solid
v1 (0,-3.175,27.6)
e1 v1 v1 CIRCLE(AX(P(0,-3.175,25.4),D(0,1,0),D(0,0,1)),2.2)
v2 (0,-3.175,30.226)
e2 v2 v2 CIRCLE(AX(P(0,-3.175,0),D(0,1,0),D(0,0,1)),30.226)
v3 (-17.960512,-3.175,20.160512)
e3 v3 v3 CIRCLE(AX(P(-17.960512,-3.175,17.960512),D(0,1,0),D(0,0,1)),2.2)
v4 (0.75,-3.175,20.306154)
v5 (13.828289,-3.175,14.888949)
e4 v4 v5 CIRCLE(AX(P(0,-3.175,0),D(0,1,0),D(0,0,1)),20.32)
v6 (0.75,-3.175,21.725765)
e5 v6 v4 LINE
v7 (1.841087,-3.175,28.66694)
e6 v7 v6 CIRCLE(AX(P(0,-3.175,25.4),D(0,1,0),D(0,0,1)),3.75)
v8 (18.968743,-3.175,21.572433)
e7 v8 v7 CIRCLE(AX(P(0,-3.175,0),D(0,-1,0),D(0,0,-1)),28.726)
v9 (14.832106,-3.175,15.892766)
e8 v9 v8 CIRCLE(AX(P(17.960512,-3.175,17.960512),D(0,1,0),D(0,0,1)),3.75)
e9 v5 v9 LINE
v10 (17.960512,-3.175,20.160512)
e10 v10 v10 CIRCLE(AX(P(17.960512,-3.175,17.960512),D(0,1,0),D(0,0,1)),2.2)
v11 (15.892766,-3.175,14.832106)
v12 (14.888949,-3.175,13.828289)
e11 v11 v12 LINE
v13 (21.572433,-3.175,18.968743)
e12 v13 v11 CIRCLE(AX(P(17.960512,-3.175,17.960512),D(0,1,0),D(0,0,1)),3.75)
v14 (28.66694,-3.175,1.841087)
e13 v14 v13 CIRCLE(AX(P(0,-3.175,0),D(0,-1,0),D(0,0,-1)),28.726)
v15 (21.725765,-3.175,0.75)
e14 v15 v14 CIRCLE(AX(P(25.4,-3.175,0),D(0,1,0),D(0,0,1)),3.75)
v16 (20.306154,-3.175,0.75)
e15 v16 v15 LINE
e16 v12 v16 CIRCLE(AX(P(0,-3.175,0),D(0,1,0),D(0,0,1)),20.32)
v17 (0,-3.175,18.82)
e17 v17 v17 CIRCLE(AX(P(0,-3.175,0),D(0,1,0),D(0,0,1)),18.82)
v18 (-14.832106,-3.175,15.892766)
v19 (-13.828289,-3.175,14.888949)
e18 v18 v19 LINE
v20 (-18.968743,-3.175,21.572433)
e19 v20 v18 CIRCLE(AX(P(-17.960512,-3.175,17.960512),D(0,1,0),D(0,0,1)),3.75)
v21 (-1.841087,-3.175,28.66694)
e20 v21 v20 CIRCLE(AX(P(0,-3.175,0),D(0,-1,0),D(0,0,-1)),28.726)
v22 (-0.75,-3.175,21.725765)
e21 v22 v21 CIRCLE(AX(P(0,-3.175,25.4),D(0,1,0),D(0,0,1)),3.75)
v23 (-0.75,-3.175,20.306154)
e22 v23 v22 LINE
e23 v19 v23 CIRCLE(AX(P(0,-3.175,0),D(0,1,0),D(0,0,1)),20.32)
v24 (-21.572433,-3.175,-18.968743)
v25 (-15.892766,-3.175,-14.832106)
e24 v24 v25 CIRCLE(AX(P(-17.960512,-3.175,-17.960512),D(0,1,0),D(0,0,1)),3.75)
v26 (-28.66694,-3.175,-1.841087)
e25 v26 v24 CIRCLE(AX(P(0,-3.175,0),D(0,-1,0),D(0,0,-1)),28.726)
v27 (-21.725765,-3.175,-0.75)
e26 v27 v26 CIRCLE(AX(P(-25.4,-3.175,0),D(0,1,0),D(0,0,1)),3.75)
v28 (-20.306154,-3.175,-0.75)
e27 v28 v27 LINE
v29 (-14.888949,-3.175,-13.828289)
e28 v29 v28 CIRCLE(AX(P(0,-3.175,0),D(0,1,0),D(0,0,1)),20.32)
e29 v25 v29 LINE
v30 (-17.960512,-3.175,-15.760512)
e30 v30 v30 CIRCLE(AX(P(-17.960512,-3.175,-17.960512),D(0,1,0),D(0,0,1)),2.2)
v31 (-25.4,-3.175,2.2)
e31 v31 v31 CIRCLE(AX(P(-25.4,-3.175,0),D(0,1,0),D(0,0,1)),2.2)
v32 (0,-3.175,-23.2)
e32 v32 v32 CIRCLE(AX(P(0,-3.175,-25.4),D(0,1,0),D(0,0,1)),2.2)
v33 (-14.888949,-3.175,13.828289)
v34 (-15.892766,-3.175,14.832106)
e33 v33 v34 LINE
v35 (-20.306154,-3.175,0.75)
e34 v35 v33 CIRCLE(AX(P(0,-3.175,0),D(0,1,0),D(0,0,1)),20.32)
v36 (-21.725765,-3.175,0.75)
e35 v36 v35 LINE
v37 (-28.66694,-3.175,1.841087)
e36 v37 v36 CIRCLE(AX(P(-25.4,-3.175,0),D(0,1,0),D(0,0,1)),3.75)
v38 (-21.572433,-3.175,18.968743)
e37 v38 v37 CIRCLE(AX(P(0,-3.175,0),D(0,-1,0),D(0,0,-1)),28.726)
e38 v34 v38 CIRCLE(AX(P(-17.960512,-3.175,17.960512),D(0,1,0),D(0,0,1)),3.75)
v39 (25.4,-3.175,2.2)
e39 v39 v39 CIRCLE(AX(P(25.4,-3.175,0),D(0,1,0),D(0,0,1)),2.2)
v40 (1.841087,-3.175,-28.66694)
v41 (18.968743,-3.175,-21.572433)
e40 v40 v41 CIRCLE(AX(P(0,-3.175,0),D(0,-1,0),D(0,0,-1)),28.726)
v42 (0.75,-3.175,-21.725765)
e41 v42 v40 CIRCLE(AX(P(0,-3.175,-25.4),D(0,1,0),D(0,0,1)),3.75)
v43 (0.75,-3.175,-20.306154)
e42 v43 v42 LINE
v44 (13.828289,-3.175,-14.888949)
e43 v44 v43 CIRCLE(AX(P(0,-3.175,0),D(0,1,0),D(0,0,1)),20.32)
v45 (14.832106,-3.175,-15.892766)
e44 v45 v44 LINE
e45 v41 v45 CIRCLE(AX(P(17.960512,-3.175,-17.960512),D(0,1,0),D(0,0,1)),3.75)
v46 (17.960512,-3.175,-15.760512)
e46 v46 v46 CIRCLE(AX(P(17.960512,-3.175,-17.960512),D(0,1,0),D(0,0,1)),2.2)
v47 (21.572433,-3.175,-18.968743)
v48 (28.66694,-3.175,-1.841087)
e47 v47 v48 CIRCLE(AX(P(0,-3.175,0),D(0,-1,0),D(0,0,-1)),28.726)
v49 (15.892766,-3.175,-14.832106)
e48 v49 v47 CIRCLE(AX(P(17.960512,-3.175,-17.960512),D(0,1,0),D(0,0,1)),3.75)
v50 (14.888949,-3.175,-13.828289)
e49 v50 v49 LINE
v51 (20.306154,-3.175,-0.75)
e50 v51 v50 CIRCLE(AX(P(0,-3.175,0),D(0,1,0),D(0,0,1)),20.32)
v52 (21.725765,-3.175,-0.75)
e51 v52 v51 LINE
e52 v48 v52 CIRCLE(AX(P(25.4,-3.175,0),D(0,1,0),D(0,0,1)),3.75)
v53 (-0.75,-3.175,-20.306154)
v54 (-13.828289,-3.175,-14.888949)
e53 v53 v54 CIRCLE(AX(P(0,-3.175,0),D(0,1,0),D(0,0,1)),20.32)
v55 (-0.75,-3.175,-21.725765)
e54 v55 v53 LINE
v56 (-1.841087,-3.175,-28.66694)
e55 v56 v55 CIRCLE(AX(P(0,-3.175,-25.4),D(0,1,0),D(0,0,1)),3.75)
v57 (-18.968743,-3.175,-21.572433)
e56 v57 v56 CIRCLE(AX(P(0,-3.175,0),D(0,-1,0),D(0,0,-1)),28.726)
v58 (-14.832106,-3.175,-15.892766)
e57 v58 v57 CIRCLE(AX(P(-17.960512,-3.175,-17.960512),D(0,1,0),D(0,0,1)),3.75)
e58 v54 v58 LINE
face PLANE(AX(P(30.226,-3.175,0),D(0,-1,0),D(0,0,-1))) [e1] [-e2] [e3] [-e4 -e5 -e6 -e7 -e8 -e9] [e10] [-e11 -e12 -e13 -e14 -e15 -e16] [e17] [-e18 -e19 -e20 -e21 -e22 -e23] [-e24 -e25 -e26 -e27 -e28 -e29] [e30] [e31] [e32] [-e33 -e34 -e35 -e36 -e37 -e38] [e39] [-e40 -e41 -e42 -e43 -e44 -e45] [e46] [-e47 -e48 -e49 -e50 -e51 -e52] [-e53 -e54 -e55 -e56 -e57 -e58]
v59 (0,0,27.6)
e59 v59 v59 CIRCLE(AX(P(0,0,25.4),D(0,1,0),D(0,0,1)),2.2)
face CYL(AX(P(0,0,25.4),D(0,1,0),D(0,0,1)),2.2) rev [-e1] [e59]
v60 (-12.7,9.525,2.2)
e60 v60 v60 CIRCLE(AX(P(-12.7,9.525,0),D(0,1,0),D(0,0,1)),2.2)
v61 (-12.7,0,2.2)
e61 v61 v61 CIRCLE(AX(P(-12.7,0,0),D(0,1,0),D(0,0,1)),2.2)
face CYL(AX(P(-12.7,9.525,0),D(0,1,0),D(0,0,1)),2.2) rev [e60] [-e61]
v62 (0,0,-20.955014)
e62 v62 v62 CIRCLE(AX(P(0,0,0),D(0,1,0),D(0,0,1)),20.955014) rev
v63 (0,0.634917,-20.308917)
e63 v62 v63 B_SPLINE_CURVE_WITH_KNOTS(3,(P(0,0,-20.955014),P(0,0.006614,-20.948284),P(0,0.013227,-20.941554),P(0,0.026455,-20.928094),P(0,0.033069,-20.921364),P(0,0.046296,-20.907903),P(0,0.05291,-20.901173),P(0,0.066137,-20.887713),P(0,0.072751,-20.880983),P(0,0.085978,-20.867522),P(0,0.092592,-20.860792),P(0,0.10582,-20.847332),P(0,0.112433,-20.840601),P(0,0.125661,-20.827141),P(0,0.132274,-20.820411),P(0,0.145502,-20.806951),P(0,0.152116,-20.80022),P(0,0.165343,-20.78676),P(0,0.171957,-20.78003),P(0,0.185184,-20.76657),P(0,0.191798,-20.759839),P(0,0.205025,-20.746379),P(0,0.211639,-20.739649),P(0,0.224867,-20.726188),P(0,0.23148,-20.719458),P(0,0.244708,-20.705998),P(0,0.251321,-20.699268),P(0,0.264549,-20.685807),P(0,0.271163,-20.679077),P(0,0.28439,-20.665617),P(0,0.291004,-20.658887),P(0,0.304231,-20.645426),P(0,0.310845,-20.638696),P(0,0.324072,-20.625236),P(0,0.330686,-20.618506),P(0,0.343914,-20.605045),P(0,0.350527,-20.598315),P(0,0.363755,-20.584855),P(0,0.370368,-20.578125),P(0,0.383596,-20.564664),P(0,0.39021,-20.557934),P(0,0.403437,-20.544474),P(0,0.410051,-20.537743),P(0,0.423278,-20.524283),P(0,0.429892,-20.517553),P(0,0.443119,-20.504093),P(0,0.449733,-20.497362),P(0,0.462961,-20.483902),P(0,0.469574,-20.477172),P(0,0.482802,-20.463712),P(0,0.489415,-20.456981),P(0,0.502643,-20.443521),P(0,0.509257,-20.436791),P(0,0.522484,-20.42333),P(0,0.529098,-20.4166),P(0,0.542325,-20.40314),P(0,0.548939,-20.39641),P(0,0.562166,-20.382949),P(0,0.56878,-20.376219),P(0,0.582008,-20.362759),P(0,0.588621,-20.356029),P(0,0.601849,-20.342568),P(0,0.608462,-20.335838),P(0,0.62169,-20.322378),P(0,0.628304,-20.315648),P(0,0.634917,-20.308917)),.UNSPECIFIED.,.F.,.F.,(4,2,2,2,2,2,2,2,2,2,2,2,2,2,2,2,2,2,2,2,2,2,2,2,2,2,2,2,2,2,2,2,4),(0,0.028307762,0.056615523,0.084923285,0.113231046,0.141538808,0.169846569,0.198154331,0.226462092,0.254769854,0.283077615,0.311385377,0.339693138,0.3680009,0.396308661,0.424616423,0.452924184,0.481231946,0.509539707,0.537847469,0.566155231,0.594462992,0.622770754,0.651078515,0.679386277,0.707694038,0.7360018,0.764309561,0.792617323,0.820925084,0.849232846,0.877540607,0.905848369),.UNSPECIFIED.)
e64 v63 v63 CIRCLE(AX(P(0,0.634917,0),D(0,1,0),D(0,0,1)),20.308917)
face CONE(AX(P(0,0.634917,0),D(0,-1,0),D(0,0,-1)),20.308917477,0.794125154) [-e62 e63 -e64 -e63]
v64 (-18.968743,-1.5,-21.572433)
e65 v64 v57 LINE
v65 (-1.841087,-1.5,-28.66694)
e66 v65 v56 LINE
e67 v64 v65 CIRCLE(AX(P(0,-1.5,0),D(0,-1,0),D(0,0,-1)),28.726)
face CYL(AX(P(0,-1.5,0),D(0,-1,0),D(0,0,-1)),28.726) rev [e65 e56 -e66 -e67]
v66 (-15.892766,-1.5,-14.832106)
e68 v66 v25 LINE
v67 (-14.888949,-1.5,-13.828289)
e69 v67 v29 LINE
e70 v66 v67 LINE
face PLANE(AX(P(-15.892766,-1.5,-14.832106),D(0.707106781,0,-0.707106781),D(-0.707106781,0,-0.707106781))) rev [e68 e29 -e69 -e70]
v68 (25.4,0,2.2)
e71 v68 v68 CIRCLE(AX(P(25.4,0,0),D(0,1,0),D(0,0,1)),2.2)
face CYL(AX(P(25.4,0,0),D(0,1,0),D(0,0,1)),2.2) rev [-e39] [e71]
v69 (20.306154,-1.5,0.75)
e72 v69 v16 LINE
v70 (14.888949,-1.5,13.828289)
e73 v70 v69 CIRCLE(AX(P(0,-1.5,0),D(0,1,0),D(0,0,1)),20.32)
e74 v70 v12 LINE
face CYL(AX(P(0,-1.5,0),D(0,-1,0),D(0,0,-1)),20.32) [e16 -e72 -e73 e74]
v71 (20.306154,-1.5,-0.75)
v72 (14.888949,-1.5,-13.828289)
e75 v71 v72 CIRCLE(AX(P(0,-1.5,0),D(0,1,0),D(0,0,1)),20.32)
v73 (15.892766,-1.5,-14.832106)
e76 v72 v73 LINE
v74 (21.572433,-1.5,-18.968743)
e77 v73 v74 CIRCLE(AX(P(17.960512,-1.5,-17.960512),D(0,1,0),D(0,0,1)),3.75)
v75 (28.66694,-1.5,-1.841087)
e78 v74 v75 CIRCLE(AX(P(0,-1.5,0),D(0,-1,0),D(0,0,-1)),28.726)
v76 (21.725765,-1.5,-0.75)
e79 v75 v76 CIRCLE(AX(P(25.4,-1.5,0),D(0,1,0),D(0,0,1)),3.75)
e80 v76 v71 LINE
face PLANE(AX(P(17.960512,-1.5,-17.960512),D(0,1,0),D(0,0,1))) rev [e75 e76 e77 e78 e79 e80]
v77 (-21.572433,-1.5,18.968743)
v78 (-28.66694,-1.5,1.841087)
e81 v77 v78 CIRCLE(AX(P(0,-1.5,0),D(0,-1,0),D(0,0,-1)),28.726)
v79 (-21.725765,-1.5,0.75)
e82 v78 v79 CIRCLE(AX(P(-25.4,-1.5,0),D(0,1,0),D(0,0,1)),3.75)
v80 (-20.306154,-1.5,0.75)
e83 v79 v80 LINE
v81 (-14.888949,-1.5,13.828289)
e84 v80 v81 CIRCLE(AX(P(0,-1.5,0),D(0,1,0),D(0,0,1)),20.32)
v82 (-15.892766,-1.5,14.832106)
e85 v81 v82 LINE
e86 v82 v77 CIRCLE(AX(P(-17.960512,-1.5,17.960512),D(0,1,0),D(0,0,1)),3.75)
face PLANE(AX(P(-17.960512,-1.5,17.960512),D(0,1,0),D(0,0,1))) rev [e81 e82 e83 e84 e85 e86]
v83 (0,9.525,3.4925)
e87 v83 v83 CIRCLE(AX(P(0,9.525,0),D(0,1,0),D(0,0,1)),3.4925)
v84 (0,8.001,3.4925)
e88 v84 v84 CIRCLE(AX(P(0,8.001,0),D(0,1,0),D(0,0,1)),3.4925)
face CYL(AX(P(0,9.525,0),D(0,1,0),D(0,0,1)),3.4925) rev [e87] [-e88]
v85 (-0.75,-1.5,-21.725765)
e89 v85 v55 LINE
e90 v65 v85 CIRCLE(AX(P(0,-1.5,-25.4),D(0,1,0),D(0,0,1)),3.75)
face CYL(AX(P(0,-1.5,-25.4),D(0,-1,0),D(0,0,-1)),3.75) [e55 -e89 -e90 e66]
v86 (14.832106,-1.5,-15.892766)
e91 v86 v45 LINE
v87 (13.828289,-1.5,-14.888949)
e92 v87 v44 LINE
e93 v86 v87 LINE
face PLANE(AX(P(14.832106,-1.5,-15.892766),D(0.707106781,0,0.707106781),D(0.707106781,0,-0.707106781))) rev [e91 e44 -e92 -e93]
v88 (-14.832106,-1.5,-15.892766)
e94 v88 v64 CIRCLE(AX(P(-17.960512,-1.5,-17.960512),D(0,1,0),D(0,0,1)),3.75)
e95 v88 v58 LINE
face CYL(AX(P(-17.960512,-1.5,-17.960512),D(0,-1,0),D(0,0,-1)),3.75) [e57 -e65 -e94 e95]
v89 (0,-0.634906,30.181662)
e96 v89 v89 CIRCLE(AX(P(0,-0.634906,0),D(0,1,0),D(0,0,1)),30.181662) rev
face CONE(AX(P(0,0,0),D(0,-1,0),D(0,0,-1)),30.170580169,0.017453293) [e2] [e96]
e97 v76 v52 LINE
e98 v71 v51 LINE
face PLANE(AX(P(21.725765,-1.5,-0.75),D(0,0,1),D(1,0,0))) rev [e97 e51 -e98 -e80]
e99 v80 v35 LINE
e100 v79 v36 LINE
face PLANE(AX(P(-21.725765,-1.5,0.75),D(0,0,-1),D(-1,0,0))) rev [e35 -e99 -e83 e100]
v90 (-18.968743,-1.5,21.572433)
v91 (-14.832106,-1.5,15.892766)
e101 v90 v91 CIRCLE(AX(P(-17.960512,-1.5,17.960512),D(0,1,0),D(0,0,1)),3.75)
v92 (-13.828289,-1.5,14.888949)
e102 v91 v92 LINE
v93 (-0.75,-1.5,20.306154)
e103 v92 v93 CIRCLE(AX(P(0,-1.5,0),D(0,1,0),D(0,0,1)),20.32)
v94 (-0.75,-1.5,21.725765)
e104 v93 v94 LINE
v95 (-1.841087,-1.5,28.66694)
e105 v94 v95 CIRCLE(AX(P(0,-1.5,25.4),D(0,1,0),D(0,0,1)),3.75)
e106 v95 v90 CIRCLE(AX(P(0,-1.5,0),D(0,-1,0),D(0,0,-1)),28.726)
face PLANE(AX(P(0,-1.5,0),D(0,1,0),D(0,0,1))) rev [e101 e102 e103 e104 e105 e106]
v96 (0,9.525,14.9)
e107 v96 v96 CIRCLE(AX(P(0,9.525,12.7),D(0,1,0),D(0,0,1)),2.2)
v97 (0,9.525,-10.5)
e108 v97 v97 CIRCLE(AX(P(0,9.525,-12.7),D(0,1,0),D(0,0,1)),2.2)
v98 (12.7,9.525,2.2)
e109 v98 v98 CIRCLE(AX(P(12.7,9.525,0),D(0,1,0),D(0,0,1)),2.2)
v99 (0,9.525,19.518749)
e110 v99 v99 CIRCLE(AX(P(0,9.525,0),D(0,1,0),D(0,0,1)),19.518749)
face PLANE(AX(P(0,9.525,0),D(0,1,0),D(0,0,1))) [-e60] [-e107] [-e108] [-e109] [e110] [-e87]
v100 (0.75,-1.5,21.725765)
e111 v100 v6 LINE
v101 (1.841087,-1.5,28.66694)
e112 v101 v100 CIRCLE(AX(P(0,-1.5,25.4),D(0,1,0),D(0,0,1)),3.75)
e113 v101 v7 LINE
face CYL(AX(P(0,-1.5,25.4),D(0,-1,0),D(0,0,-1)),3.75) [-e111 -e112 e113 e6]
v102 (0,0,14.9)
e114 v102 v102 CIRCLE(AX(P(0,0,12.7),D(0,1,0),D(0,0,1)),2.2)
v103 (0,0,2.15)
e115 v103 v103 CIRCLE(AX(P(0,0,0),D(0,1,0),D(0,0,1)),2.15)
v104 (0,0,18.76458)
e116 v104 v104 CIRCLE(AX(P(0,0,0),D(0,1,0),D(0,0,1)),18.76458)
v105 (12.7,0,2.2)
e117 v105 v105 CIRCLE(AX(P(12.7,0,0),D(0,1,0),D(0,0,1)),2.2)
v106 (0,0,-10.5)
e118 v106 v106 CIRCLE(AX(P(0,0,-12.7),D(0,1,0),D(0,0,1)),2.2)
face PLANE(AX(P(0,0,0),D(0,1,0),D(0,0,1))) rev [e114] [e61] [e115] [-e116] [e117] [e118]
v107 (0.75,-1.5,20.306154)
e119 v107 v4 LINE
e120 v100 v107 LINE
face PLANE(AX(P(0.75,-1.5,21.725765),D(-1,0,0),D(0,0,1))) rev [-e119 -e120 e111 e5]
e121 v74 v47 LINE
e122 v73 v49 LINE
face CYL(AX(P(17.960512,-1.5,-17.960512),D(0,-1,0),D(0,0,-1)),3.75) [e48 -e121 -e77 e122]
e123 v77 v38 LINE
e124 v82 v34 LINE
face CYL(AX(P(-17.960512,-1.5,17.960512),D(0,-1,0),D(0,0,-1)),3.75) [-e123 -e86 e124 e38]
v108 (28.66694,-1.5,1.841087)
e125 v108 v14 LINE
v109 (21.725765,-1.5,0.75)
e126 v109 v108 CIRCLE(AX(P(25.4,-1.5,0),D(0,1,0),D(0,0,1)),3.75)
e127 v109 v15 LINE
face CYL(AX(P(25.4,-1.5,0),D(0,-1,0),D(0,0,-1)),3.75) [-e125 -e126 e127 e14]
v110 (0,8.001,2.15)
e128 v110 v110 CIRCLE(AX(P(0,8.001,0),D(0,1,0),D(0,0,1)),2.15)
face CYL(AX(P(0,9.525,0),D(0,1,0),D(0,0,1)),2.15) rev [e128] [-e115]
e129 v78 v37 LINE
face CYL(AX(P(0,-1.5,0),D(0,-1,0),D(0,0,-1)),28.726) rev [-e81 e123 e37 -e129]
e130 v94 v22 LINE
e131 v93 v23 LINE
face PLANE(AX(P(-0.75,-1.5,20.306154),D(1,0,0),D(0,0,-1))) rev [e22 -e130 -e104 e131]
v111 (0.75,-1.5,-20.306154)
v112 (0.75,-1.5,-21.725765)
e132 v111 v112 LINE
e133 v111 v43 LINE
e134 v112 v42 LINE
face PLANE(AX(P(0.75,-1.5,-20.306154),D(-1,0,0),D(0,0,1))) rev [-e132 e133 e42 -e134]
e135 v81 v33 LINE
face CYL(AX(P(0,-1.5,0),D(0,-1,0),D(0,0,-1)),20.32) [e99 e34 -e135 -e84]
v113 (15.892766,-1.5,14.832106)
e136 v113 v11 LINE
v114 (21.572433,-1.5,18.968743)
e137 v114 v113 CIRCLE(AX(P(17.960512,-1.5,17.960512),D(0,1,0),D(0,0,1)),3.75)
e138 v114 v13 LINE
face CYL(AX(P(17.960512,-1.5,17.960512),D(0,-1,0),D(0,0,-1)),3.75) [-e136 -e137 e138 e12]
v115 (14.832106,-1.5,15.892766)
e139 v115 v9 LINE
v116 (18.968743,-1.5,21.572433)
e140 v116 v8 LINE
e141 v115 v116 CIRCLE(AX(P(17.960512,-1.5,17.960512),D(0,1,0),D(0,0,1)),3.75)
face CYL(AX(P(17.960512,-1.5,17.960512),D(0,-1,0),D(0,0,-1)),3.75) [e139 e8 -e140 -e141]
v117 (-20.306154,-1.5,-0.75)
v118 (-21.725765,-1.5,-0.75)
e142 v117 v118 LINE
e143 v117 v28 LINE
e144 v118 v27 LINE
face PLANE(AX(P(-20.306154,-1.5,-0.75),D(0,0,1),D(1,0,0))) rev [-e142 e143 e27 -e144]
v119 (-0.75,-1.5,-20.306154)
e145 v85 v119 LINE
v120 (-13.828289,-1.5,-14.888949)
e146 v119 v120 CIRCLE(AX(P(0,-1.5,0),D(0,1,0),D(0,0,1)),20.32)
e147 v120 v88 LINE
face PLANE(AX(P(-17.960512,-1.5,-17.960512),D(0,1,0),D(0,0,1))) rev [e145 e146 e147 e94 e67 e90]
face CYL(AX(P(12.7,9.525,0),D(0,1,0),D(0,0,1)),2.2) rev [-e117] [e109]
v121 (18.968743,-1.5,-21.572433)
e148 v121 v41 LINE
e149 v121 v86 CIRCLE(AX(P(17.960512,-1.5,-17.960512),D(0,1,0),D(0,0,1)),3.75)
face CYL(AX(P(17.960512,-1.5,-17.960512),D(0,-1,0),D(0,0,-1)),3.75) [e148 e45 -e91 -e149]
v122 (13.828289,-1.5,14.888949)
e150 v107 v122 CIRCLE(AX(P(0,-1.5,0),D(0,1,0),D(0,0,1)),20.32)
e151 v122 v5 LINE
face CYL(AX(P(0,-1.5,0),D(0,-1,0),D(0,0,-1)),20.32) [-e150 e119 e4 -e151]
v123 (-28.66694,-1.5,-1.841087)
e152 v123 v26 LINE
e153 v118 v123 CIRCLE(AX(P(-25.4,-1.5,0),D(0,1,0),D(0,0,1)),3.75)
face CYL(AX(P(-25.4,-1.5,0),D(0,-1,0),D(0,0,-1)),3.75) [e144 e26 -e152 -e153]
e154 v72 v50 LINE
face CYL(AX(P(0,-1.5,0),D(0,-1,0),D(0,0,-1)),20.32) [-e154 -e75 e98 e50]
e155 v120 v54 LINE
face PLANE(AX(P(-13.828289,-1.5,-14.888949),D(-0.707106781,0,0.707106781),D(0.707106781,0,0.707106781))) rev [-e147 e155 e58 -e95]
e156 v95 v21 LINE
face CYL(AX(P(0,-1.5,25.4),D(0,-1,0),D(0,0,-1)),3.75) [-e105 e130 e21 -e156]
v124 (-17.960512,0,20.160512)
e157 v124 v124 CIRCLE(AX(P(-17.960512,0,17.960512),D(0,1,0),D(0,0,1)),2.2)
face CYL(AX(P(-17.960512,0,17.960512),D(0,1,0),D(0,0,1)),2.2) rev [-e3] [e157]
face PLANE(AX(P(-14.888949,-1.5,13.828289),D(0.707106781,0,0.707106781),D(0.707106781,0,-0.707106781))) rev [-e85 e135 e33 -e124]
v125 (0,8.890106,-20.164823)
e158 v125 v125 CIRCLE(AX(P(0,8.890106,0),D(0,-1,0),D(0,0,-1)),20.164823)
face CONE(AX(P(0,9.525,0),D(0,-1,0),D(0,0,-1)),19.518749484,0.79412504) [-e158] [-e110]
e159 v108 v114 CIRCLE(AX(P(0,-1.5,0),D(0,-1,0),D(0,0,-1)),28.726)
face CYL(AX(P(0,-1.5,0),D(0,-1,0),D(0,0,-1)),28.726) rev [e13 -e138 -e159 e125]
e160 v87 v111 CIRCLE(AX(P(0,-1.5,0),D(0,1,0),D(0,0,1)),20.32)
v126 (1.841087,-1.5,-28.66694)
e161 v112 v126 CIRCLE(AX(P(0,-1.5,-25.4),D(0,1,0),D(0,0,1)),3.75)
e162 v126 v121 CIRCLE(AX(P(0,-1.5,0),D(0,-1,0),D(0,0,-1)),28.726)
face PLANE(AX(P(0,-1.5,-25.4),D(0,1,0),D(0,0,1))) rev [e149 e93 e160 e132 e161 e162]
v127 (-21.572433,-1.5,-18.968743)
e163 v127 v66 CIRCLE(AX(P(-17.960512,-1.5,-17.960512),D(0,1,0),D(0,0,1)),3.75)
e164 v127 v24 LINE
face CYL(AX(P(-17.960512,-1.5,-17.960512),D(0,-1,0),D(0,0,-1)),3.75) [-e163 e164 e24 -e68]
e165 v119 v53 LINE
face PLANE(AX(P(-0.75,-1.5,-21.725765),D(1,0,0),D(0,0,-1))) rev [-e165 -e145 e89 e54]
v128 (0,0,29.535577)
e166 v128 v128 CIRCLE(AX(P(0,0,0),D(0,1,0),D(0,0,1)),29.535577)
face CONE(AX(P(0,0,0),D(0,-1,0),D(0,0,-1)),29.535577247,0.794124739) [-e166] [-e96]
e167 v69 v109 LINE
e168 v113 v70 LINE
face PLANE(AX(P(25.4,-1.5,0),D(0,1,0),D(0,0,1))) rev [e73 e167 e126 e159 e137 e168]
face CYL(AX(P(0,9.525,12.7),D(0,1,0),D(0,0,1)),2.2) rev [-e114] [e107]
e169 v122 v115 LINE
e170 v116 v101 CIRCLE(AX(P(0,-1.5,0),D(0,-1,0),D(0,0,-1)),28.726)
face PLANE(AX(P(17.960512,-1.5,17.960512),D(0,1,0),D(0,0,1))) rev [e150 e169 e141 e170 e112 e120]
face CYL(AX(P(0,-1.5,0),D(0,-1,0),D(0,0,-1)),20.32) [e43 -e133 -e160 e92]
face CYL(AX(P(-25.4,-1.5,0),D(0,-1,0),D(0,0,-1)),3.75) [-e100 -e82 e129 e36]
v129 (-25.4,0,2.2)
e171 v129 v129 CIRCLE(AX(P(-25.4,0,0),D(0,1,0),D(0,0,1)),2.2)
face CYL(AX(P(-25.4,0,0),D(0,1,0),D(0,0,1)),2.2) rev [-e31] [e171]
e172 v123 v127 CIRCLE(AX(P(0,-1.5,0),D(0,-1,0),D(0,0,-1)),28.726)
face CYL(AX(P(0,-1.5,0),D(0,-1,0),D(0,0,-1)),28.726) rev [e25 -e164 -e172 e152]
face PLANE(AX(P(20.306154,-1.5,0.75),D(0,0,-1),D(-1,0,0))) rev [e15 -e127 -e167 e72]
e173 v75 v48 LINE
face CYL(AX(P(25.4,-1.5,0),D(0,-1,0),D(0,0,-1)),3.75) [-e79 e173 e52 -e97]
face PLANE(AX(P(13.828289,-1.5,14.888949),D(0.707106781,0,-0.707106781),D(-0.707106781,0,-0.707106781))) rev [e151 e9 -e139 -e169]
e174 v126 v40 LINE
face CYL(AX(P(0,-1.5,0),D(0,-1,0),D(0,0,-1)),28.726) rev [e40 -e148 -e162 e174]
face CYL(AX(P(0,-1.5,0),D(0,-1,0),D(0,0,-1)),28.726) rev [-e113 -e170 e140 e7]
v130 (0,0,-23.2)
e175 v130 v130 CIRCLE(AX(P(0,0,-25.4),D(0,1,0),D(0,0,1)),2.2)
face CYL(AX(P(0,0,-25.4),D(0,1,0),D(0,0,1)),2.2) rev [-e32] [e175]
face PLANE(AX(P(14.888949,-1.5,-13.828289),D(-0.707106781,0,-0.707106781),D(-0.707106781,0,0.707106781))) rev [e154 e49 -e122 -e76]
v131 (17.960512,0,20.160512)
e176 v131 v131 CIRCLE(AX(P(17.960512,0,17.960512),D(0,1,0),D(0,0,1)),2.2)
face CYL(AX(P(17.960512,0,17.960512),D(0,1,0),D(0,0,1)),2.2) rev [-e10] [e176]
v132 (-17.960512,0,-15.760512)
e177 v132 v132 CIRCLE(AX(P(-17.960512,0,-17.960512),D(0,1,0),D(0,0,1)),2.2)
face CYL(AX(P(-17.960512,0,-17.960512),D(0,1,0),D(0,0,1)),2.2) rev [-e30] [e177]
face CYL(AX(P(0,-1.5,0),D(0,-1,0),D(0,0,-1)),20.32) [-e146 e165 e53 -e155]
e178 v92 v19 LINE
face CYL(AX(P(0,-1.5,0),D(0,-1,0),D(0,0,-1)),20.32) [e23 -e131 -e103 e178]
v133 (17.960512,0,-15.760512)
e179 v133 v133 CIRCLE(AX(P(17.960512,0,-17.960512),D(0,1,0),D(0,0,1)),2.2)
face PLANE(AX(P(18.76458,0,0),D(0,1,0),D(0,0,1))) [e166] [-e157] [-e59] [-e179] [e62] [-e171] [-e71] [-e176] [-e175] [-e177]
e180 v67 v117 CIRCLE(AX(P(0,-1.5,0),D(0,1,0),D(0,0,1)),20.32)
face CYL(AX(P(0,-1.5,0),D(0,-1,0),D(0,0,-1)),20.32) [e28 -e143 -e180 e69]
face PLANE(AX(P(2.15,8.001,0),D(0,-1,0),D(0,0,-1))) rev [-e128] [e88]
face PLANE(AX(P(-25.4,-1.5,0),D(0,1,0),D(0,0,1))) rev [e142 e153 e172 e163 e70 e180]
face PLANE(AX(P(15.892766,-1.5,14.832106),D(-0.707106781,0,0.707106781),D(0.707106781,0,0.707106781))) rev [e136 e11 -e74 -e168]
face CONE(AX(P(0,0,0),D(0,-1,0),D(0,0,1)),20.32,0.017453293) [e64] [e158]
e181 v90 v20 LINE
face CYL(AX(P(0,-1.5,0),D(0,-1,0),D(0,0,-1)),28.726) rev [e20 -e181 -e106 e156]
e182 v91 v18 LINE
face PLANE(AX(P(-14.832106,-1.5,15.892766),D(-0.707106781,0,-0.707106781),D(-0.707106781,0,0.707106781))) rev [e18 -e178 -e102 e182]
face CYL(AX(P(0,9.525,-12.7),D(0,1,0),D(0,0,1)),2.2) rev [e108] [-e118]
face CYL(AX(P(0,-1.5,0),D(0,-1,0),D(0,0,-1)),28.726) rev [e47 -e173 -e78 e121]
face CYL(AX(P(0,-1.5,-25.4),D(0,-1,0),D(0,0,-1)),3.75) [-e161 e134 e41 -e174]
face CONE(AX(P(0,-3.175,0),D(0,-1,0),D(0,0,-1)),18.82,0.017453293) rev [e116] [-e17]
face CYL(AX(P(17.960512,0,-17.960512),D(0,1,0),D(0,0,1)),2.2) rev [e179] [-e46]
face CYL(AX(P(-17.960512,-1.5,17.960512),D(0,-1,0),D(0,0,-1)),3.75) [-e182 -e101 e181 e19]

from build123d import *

# Parameters (mm, degrees)
SKETCH2_R                                        = 20.32
BOSS_EXTRUDE1_DEPTH                              = 9.525
BOSS_EXTRUDE1_TAPER                              = 1
CUT_EXTRUDE1_DEPTH                               = 1.675
CUT_EXTRUDE2_DEPTH                               = 1.675
CUT_EXTRUDE3_DEPTH                               = 1.675
CUT_EXTRUDE4_DEPTH                               = 1.675
CUT_EXTRUDE5_DEPTH                               = 1.675
CUT_EXTRUDE6_DEPTH                               = 1.675
CUT_EXTRUDE7_DEPTH                               = 1.675
CUT_EXTRUDE8_DEPTH                               = 1.675
SKETCH11_W                                       = 4
SKETCH11_H                                       = 6.374
F_4_4_4_4_DIAMETER_HOLE1_D                       = 4.4
F_4_4_4_4_DIAMETER_HOLE2_D                       = 4.4
CBORE_FOR_M4_HEX_HEAD_MACHINE_SCREW1_D           = 4.3
CBORE_FOR_M4_HEX_HEAD_MACHINE_SCREW1_CBORE_D     = 6.985
CBORE_FOR_M4_HEX_HEAD_MACHINE_SCREW1_CBORE_DEPTH = 1.524
CHAMFER1_SIZE                                    = 0.635014452
CHAMFER1_SIZE2                                   = 0.635014007
CHAMFER2_SIZE                                    = 0.634991023
CHAMFER2_SIZE_2                                  = 0.634990726
CHAMFER3_SIZE                                    = 0.635002922
CHAMFER3_SIZE2                                   = 0.635003014


with BuildPart() as part:
    # Sketch1 → Revolve1 (revolve)
    with BuildSketch(Plane(origin=(0, 0, 0), x_dir=(-1, 0, 0), z_dir=(0, 0, -1)), mode=Mode.PRIVATE) as revolve1_sk:
        Polygon((-30.226, -3.175), (-18.82, -3.175), (-18.764580169, 0), (-30.170580169, 0), align=None)
    revolve(revolve1_sk.sketch.rotate(Axis((0, -3.175, 0), (0, 1, 0)), 270), axis=Axis((0, -3.175, 0), (0, 1, 0)))

    # Sketch2 → Boss-Extrude1 (add)
    with BuildSketch(Plane(origin=(0, 0, 0), x_dir=(-1, 0, 0), z_dir=(0, 1, 0))):
        Circle(SKETCH2_R)
    extrude(amount=BOSS_EXTRUDE1_DEPTH, taper=BOSS_EXTRUDE1_TAPER)

    # Sketch3 → Cut-Extrude1 (cut)
    with BuildSketch(Plane.XZ.offset(3.175)):
        with BuildLine():
            Line((-0.75, 20.30615424), (-0.75, 21.725765386))
            ThreePointArc((-0.75, 21.725765386), (-3.704512163, 24.817685966), (-1.841086622, 28.666940472))
            ThreePointArc((-1.841086622, 28.666940472), (-10.992964278, 26.539363451), (-18.968743169, 21.572432839))
            ThreePointArc((-18.968743169, 21.572432839), (-14.929268369, 20.168239712), (-14.832105945, 15.892766117))
            Line((-14.832105945, 15.892766117), (-13.828289277, 14.888949448))
            ThreePointArc((-13.828289277, 14.888949448), (-7.776127346, 18.773232101), (-0.75, 20.30615424))
        make_face()
    extrude(amount=-CUT_EXTRUDE1_DEPTH, mode=Mode.SUBTRACT)

    # Sketch4 → Cut-Extrude2 (cut)
    with BuildSketch(Plane.XZ.offset(3.175)):
        with BuildLine():
            Line((0.75, 21.725765386), (0.75, 20.30615424))
            ThreePointArc((0.75, 20.30615424), (7.776127346, 18.773232101), (13.828289277, 14.888949448))
            Line((13.828289277, 14.888949448), (14.832105945, 15.892766117))
            ThreePointArc((14.832105945, 15.892766117), (14.929268369, 20.168239712), (18.968743169, 21.572432839))
            ThreePointArc((18.968743169, 21.572432839), (10.992964278, 26.539363451), (1.841086622, 28.666940472))
            ThreePointArc((1.841086622, 28.666940472), (3.704512163, 24.817685966), (0.75, 21.725765386))
        make_face()
    extrude(amount=-CUT_EXTRUDE2_DEPTH, mode=Mode.SUBTRACT)

    # Sketch5 → Cut-Extrude3 (cut)
    with BuildSketch(Plane.XZ.offset(3.175)):
        with BuildLine():
            Line((15.892766117, 14.832105945), (14.888949448, 13.828289277))
            ThreePointArc((14.888949448, 13.828289277), (18.773232101, 7.776127346), (20.30615424, 0.75))
            Line((20.30615424, 0.75), (21.725765386, 0.75))
            ThreePointArc((21.725765386, 0.75), (24.817685966, 3.704512163), (28.666940472, 1.841086622))
            ThreePointArc((28.666940472, 1.841086622), (26.539363451, 10.992964278), (21.572432839, 18.968743169))
            ThreePointArc((21.572432839, 18.968743169), (20.168239712, 14.929268369), (15.892766117, 14.832105945))
        make_face()
    extrude(amount=-CUT_EXTRUDE3_DEPTH, mode=Mode.SUBTRACT)

    # Sketch6 → Cut-Extrude4 (cut)
    with BuildSketch(Plane.XZ.offset(3.175)):
        with BuildLine():
            Line((21.725765386, -0.75), (20.30615424, -0.75))
            ThreePointArc((20.30615424, -0.75), (18.773232101, -7.776127346), (14.888949448, -13.828289277))
            Line((14.888949448, -13.828289277), (15.892766117, -14.832105945))
            ThreePointArc((15.892766117, -14.832105945), (20.168239712, -14.929268369), (21.572432839, -18.968743169))
            ThreePointArc((21.572432839, -18.968743169), (26.539363451, -10.992964278), (28.666940472, -1.841086622))
            ThreePointArc((28.666940472, -1.841086622), (24.817685966, -3.704512163), (21.725765386, -0.75))
        make_face()
    extrude(amount=-CUT_EXTRUDE4_DEPTH, mode=Mode.SUBTRACT)

    # Sketch7 → Cut-Extrude5 (cut)
    with BuildSketch(Plane.XZ.offset(3.175)):
        with BuildLine():
            Line((14.832105945, -15.892766117), (13.828289277, -14.888949448))
            ThreePointArc((13.828289277, -14.888949448), (7.776127346, -18.773232101), (0.75, -20.30615424))
            Line((0.75, -20.30615424), (0.75, -21.725765386))
            ThreePointArc((0.75, -21.725765386), (3.704512163, -24.817685966), (1.841086622, -28.666940472))
            ThreePointArc((1.841086622, -28.666940472), (10.992964278, -26.539363451), (18.968743169, -21.572432839))
            ThreePointArc((18.968743169, -21.572432839), (14.929268369, -20.168239712), (14.832105945, -15.892766117))
        make_face()
    extrude(amount=-CUT_EXTRUDE5_DEPTH, mode=Mode.SUBTRACT)

    # Sketch8 → Cut-Extrude6 (cut)
    with BuildSketch(Plane.XZ.offset(3.175)):
        with BuildLine():
            Line((-0.75, -21.725765386), (-0.75, -20.30615424))
            ThreePointArc((-0.75, -20.30615424), (-7.776127346, -18.773232101), (-13.828289277, -14.888949448))
            Line((-13.828289277, -14.888949448), (-14.832105945, -15.892766117))
            ThreePointArc((-14.832105945, -15.892766117), (-14.929268369, -20.168239712), (-18.968743169, -21.572432839))
            ThreePointArc((-18.968743169, -21.572432839), (-10.992964278, -26.539363451), (-1.841086622, -28.666940472))
            ThreePointArc((-1.841086622, -28.666940472), (-3.704512163, -24.817685966), (-0.75, -21.725765386))
        make_face()
    extrude(amount=-CUT_EXTRUDE6_DEPTH, mode=Mode.SUBTRACT)

    # Sketch9 → Cut-Extrude7 (cut)
    with BuildSketch(Plane.XZ.offset(3.175)):
        with BuildLine():
            Line((-15.892766117, -14.832105945), (-14.888949448, -13.828289277))
            ThreePointArc((-14.888949448, -13.828289277), (-18.773232101, -7.776127346), (-20.30615424, -0.75))
            Line((-20.30615424, -0.75), (-21.725765386, -0.75))
            ThreePointArc((-21.725765386, -0.75), (-24.817685966, -3.704512163), (-28.666940472, -1.841086622))
            ThreePointArc((-28.666940472, -1.841086622), (-26.539363451, -10.992964278), (-21.572432839, -18.968743169))
            ThreePointArc((-21.572432839, -18.968743169), (-20.168239712, -14.929268369), (-15.892766117, -14.832105945))
        make_face()
    extrude(amount=-CUT_EXTRUDE7_DEPTH, mode=Mode.SUBTRACT)

    # Sketch10 → Cut-Extrude8 (cut)
    with BuildSketch(Plane.XZ.offset(3.175)):
        with BuildLine():
            Line((-21.725765386, 0.75), (-20.30615424, 0.75))
            ThreePointArc((-20.30615424, 0.75), (-18.773232101, 7.776127346), (-14.888949448, 13.828289277))
            Line((-14.888949448, 13.828289277), (-15.892766117, 14.832105945))
            ThreePointArc((-15.892766117, 14.832105945), (-20.168239712, 14.929268369), (-21.572432839, 18.968743169))
            ThreePointArc((-21.572432839, 18.968743169), (-26.539363451, 10.992964278), (-28.666940472, 1.841086622))
            ThreePointArc((-28.666940472, 1.841086622), (-24.817685966, 3.704512163), (-21.725765386, 0.75))
        make_face()
    extrude(amount=-CUT_EXTRUDE8_DEPTH, mode=Mode.SUBTRACT)

    # Sketch11 → Revolve2 (revolve)
    with BuildSketch(Plane.XY, mode=Mode.PRIVATE) as revolve2_sk:
        with Locations((2, 4.838)):
            Rectangle(SKETCH11_W, SKETCH11_H)
    revolve(revolve2_sk.sketch.rotate(Axis((0, 8.025, 0), (0, -1, 0)), 90), axis=Axis((0, 8.025, 0), (0, -1, 0)))

    # Ø4.4 (4.4) Diameter Hole1 (through all)
    with Locations(Plane(origin=(0, 0, 0), x_dir=(1, 0, 0), z_dir=(0, 1, 0))):
        with Locations((25.4, 0), (17.960512242, 17.960512242), (0, 25.4), (-17.960512242, 17.960512242), (-25.4, 0), (-17.960512242, -17.960512242), (0, -25.4), (17.960512242, -17.960512242)):
            Hole(F_4_4_4_4_DIAMETER_HOLE1_D / 2)

    # Ø4.4 (4.4) Diameter Hole2 (through all)
    with Locations(Plane(origin=(0, 9.525, 0), x_dir=(1, 0, 0), z_dir=(0, 1, 0))):
        with Locations((12.7, 0), (0, 12.7), (-12.7, 0), (0, -12.7)):
            Hole(F_4_4_4_4_DIAMETER_HOLE2_D / 2)

    # CBORE for M4 Hex Head Machine Screw1 (through all)
    with Locations(Plane(origin=(0, 9.525, 0), x_dir=(1, 0, 0), z_dir=(0, 1, 0))):
        with Locations((0, 0)):
            CounterBoreHole(CBORE_FOR_M4_HEX_HEAD_MACHINE_SCREW1_D / 2, CBORE_FOR_M4_HEX_HEAD_MACHINE_SCREW1_CBORE_D / 2, CBORE_FOR_M4_HEX_HEAD_MACHINE_SCREW1_CBORE_DEPTH)

    # Chamfer1
    chamfer1_edges = [part.edges().sort_by_distance(p)[0] for p in [
        (20.32, 0, 0),
    ]]
    chamfer1_side = [part.faces().sort_by_distance(p)[0] for p in [
        (0, 0, -29.317227296),
    ]]
    chamfer(chamfer1_edges, length=CHAMFER1_SIZE, length2=CHAMFER1_SIZE2, reference=chamfer1_side[0])

    # Chamfer2
    # the kernel refuses this chamfer: 0.634991023, 0.634990726 mm, written as the material it takes off along each edge
    with BuildSketch(Plane(origin=(0, 9.525, 0), x_dir=(-1, 0, 0), z_dir=(0, 0, 1))) as chamfer2_piece_1:
        Polygon((20.153740507 + CHAMFER2_SIZE * 0.0174524064387, CHAMFER2_SIZE * 0.999847695238), (20.153740507 - CHAMFER2_SIZE_2, 0), (20.153740507, 0), align=None)
    revolve(axis=Axis((0, 9.525, 0), (0, -1, 0)), mode=Mode.SUBTRACT)

    # Chamfer3
    chamfer3_edges = [part.edges().sort_by_distance(p)[0] for p in [
        (0, 0, -30.170580169),
    ]]
    chamfer3_side = [part.faces().sort_by_distance(p)[0] for p in [
        (21.808367326, 0, 0),
    ]]
    chamfer(chamfer3_edges, length=CHAMFER3_SIZE, length2=CHAMFER3_SIZE2, reference=chamfer3_side[0])


solid = part.part
